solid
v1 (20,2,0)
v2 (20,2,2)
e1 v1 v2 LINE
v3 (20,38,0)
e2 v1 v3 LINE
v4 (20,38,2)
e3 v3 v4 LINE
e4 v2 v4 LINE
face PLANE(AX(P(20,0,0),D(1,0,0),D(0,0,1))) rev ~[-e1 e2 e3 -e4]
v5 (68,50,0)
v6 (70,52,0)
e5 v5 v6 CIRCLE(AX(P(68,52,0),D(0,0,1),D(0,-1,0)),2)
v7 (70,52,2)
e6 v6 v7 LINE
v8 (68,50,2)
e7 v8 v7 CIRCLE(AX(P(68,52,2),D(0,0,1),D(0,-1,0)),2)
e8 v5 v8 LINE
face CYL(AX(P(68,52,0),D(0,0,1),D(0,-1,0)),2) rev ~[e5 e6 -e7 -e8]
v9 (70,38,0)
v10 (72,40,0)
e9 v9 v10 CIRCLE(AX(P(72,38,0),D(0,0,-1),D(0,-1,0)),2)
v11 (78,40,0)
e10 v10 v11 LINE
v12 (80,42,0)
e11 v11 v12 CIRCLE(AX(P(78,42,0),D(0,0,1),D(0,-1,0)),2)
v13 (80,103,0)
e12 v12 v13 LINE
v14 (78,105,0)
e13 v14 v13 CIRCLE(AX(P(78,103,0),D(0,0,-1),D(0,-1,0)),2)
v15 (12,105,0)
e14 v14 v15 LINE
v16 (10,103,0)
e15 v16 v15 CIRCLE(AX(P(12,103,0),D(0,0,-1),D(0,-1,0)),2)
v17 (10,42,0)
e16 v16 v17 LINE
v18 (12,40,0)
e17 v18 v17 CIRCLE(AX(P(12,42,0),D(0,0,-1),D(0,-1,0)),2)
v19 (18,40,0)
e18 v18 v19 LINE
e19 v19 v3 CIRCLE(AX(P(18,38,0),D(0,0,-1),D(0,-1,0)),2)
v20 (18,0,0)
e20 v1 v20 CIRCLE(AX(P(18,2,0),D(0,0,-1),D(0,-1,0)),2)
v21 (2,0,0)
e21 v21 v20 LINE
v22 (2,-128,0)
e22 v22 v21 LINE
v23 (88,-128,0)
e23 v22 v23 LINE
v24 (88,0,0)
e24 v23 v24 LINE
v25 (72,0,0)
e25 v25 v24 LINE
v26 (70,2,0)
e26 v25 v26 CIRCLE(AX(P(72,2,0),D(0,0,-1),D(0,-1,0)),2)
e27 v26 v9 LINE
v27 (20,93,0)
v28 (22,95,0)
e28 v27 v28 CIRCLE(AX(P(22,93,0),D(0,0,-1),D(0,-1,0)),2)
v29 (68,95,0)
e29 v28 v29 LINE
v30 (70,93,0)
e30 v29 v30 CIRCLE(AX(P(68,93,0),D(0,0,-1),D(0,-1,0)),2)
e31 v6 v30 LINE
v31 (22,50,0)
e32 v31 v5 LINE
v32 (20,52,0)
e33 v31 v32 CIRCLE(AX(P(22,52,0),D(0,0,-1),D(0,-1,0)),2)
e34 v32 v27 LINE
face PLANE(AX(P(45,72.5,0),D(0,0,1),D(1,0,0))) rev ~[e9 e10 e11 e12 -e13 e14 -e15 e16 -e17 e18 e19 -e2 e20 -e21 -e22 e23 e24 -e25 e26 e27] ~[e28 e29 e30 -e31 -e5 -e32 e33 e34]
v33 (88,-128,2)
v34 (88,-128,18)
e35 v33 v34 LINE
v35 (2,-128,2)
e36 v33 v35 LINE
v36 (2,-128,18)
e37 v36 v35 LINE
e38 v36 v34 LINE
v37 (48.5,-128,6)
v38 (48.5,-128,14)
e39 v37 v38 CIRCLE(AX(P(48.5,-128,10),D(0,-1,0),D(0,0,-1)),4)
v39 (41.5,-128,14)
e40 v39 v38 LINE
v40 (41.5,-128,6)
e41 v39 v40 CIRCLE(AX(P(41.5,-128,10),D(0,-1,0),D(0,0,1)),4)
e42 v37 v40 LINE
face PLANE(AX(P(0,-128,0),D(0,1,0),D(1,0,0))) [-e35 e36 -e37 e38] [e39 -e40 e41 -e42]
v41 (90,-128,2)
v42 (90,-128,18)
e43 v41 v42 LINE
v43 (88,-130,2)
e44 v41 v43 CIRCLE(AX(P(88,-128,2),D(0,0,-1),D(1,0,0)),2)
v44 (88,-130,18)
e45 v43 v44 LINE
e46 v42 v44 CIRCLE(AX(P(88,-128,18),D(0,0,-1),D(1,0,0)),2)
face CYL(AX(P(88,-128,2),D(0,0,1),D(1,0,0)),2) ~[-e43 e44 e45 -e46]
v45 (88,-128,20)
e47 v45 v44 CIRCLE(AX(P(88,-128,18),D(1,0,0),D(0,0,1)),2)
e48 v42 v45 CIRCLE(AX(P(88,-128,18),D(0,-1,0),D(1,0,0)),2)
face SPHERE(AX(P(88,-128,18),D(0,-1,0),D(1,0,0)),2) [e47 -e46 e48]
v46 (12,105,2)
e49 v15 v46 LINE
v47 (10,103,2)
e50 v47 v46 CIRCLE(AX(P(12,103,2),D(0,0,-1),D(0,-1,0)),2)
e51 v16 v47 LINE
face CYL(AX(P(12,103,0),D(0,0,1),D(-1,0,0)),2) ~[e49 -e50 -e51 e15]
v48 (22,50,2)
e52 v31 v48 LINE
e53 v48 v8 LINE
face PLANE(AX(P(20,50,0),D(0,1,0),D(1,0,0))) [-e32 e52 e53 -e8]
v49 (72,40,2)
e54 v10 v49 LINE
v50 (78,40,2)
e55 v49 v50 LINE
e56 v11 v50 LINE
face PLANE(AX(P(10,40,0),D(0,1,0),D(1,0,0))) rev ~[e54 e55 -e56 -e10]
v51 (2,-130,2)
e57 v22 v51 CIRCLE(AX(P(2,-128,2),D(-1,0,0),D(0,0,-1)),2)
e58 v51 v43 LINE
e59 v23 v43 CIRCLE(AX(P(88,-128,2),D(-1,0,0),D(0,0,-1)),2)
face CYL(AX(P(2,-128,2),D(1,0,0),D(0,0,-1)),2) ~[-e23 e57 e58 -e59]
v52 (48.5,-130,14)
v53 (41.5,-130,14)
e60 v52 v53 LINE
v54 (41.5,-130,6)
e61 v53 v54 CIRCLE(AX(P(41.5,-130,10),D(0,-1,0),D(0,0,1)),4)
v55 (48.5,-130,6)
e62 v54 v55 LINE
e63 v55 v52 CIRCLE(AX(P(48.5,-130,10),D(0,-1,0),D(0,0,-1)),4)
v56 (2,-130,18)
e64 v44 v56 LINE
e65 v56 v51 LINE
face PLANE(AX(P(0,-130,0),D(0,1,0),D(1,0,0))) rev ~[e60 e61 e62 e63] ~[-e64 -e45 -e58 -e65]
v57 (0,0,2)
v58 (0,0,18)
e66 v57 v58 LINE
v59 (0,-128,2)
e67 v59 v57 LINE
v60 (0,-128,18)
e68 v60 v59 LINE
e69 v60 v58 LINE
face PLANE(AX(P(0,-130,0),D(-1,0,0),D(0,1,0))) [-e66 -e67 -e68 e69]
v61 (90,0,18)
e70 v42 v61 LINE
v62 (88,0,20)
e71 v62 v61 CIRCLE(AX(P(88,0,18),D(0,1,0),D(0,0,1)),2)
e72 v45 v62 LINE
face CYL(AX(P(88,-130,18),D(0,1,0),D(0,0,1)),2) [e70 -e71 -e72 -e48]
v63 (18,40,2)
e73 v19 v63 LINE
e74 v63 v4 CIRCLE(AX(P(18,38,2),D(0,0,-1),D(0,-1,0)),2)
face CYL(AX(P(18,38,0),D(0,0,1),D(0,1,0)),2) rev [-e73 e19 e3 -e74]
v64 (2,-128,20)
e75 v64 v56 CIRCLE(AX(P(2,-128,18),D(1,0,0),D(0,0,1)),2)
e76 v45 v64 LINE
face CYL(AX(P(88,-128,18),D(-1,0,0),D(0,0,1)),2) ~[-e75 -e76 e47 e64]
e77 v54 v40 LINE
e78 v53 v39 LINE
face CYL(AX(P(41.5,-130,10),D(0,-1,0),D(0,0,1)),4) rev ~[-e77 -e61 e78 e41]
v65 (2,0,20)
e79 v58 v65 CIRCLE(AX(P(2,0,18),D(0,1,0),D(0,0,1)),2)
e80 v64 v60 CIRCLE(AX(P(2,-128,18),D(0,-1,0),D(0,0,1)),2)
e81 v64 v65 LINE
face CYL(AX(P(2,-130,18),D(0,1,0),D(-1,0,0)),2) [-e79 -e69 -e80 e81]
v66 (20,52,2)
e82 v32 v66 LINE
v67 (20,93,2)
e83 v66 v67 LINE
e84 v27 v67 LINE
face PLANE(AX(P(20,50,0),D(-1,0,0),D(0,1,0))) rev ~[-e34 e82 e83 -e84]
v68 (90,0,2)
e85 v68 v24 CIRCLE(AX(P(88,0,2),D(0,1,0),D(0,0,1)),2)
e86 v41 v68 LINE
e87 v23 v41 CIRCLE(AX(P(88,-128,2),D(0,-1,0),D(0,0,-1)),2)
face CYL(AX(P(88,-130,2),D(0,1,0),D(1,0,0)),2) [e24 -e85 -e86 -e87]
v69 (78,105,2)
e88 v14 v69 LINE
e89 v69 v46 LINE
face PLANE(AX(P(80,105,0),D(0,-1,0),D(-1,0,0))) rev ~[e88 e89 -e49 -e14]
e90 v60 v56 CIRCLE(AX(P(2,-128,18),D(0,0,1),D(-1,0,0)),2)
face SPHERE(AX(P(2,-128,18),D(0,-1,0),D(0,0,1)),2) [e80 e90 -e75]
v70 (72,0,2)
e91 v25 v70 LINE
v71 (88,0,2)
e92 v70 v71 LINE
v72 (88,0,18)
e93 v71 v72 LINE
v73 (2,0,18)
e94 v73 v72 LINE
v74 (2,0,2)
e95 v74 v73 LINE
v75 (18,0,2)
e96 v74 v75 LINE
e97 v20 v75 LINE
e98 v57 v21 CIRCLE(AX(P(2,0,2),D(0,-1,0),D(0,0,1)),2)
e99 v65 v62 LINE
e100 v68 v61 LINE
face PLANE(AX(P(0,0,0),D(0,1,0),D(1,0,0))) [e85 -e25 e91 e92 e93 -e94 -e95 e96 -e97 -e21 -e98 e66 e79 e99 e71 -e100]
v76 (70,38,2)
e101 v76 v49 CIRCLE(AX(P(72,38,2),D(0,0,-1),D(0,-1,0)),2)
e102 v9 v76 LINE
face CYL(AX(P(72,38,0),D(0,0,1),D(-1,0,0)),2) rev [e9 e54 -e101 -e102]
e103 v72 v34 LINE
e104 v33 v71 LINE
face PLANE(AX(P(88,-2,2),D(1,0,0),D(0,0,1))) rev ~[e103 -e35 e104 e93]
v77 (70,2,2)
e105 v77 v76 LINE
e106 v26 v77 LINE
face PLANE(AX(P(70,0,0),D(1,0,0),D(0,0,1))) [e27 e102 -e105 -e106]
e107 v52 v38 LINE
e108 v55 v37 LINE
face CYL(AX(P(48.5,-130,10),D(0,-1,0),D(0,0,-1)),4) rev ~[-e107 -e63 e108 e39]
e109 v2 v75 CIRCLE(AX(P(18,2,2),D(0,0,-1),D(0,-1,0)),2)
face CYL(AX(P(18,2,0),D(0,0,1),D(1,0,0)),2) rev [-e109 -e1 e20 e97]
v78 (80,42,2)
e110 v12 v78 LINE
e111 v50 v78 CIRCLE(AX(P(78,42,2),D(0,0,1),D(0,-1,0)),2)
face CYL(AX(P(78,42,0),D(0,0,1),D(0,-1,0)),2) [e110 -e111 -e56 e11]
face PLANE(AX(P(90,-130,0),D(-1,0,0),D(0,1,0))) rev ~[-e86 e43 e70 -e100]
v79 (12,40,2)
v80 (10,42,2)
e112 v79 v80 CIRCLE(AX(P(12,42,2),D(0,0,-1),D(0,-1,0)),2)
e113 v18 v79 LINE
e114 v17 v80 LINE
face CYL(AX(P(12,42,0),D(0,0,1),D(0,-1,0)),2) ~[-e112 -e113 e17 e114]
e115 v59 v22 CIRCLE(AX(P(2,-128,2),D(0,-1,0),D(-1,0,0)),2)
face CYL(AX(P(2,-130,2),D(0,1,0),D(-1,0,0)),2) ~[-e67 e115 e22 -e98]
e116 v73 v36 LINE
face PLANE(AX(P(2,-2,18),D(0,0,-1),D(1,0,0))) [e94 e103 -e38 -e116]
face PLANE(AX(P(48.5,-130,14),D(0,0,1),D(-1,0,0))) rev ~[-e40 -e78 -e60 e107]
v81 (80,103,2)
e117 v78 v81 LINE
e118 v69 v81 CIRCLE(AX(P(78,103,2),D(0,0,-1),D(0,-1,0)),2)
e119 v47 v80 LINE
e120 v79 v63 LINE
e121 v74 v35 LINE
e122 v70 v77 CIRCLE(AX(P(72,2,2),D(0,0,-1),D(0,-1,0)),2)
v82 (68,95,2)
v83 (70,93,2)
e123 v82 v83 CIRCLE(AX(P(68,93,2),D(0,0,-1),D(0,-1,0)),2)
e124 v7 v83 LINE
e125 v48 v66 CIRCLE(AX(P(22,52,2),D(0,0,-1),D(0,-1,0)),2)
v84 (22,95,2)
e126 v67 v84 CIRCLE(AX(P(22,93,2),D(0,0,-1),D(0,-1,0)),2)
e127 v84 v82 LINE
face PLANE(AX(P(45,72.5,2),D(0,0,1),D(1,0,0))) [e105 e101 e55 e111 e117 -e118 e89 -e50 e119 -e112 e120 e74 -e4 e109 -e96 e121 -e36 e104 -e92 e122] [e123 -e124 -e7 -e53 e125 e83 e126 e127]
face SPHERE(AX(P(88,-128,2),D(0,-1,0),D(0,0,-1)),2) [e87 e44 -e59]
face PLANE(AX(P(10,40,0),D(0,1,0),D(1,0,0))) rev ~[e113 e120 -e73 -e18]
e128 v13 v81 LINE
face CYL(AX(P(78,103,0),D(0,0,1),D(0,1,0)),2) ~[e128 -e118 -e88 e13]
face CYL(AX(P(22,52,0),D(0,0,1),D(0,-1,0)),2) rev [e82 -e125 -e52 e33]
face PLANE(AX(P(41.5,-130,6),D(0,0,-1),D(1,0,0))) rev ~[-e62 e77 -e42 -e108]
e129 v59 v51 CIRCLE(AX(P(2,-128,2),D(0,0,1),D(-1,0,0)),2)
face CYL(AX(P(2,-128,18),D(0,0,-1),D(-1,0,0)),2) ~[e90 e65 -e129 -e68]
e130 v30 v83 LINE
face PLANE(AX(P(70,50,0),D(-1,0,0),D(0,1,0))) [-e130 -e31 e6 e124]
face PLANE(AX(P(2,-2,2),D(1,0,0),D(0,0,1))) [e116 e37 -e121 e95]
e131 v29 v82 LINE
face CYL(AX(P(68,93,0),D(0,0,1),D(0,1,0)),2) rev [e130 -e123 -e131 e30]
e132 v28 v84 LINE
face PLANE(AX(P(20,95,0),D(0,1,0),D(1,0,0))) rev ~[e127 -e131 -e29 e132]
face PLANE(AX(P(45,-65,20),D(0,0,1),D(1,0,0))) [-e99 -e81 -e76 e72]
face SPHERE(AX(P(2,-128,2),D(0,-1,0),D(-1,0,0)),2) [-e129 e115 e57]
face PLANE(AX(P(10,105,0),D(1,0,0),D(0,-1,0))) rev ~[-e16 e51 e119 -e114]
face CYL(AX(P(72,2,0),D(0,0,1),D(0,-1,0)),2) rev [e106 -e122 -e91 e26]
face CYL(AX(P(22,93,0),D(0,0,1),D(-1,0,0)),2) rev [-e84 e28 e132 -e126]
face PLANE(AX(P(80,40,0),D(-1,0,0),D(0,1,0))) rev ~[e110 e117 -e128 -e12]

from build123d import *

# Parameters (mm, degrees)
F0_W      = 90
F0_H      = 130
F1_DEPTH  = 20
F2_W      = 50
F2_H      = 2
F3_DEPTH  = 40
F4_W      = 50
F4_H      = 45
F5_DEPTH  = 2
F6_T      = -2
F7_R      = 2
F8_R      = 2
F9_R      = 2
F10_R     = 2
F11_R     = 2
F13_DEPTH = 25


# Not quite as in the source:
# - a shell that OpenCascade refuses in one call is made with other operations: the cavity is built on its own and cut out


with BuildPart() as f1:
    # F0 (on Top) → F1 (new body)
    with BuildSketch(Plane.XY):
        with Locations((45, -65)):
            Rectangle(F0_W, F0_H)
    extrude(amount=F1_DEPTH)

    # F2 (on face) → F3 (join)
    with BuildSketch(Plane(origin=(0, 0, 0), x_dir=(-1, 0, 0), z_dir=(0, 1, 0))):
        with Locations((-45, 1)):
            Rectangle(F2_W, F2_H)
    extrude(amount=F3_DEPTH)

    # F4 (on Top) → F5 (join)
    with BuildSketch(Plane.XY):
        Polygon((20, 40), (70, 40), (80, 40), (80, 105), (10, 105), (10, 40), align=None)
        with Locations((45, 72.5)):
            Rectangle(F4_W, F4_H, mode=Mode.SUBTRACT)
    extrude(amount=F5_DEPTH)

    # F6: a shell. OpenCascade refuses it in one call, so the cavity is built on its own and cut out:
    # the body offset inwards by the wall thickness, plus a prism from it out through each open face.
    f6_core = offset(f1.part, amount=F6_T, kind=Kind.INTERSECTION, mode=Mode.PRIVATE)
    f6_exits = [f6_core.faces().sort_by_distance(p)[0] for p in [
        (45, -2, 10),
    ]]
    add(f6_core, mode=Mode.SUBTRACT)
    extrude(f6_exits, amount=-F6_T, mode=Mode.SUBTRACT)

    # F7
    f7_edges = [f1.edges().sort_by_distance(p)[0] for p in [
        (0, -65, 20),
        (90, -65, 20),
        (90, -65, 0),
        (0, -65, 0),
    ]]
    fillet(f7_edges, radius=F7_R)

    # F8
    f8_edges = [f1.edges().sort_by_distance(p)[0] for p in [
        (45, -130, 0),
    ]]
    fillet(f8_edges, radius=F8_R)

    # F9
    f9_edges = [f1.edges().sort_by_distance(p)[0] for p in [
        (10, 40, 1),
        (10, 105, 1),
        (80, 105, 1),
        (80, 40, 1),
    ]]
    fillet(f9_edges, radius=F9_R)

    # F10
    f10_edges = [f1.edges().sort_by_distance(p)[0] for p in [
        (20, 40, 1),
        (70, 40, 1),
        (70, 0, 1),
        (20, 0, 1),
    ]]
    fillet(f10_edges, radius=F10_R)

    # F11
    f11_edges = [f1.edges().sort_by_distance(p)[0] for p in [
        (20, 50, 1),
        (20, 95, 1),
        (70, 50, 1),
        (70, 95, 1),
    ]]
    fillet(f11_edges, radius=F11_R)

    # F12 (on face) → F13 (cut)
    with BuildSketch(Plane.XZ.offset(130)):
        with BuildLine():
            Line((48.5, 14), (41.5, 14))
            ThreePointArc((41.5, 14), (37.5, 10), (41.5, 6))
            Line((41.5, 6), (48.5, 6))
            ThreePointArc((48.5, 6), (52.5, 10), (48.5, 14))
        make_face()
    extrude(amount=-F13_DEPTH, mode=Mode.SUBTRACT)


solid = f1.part
